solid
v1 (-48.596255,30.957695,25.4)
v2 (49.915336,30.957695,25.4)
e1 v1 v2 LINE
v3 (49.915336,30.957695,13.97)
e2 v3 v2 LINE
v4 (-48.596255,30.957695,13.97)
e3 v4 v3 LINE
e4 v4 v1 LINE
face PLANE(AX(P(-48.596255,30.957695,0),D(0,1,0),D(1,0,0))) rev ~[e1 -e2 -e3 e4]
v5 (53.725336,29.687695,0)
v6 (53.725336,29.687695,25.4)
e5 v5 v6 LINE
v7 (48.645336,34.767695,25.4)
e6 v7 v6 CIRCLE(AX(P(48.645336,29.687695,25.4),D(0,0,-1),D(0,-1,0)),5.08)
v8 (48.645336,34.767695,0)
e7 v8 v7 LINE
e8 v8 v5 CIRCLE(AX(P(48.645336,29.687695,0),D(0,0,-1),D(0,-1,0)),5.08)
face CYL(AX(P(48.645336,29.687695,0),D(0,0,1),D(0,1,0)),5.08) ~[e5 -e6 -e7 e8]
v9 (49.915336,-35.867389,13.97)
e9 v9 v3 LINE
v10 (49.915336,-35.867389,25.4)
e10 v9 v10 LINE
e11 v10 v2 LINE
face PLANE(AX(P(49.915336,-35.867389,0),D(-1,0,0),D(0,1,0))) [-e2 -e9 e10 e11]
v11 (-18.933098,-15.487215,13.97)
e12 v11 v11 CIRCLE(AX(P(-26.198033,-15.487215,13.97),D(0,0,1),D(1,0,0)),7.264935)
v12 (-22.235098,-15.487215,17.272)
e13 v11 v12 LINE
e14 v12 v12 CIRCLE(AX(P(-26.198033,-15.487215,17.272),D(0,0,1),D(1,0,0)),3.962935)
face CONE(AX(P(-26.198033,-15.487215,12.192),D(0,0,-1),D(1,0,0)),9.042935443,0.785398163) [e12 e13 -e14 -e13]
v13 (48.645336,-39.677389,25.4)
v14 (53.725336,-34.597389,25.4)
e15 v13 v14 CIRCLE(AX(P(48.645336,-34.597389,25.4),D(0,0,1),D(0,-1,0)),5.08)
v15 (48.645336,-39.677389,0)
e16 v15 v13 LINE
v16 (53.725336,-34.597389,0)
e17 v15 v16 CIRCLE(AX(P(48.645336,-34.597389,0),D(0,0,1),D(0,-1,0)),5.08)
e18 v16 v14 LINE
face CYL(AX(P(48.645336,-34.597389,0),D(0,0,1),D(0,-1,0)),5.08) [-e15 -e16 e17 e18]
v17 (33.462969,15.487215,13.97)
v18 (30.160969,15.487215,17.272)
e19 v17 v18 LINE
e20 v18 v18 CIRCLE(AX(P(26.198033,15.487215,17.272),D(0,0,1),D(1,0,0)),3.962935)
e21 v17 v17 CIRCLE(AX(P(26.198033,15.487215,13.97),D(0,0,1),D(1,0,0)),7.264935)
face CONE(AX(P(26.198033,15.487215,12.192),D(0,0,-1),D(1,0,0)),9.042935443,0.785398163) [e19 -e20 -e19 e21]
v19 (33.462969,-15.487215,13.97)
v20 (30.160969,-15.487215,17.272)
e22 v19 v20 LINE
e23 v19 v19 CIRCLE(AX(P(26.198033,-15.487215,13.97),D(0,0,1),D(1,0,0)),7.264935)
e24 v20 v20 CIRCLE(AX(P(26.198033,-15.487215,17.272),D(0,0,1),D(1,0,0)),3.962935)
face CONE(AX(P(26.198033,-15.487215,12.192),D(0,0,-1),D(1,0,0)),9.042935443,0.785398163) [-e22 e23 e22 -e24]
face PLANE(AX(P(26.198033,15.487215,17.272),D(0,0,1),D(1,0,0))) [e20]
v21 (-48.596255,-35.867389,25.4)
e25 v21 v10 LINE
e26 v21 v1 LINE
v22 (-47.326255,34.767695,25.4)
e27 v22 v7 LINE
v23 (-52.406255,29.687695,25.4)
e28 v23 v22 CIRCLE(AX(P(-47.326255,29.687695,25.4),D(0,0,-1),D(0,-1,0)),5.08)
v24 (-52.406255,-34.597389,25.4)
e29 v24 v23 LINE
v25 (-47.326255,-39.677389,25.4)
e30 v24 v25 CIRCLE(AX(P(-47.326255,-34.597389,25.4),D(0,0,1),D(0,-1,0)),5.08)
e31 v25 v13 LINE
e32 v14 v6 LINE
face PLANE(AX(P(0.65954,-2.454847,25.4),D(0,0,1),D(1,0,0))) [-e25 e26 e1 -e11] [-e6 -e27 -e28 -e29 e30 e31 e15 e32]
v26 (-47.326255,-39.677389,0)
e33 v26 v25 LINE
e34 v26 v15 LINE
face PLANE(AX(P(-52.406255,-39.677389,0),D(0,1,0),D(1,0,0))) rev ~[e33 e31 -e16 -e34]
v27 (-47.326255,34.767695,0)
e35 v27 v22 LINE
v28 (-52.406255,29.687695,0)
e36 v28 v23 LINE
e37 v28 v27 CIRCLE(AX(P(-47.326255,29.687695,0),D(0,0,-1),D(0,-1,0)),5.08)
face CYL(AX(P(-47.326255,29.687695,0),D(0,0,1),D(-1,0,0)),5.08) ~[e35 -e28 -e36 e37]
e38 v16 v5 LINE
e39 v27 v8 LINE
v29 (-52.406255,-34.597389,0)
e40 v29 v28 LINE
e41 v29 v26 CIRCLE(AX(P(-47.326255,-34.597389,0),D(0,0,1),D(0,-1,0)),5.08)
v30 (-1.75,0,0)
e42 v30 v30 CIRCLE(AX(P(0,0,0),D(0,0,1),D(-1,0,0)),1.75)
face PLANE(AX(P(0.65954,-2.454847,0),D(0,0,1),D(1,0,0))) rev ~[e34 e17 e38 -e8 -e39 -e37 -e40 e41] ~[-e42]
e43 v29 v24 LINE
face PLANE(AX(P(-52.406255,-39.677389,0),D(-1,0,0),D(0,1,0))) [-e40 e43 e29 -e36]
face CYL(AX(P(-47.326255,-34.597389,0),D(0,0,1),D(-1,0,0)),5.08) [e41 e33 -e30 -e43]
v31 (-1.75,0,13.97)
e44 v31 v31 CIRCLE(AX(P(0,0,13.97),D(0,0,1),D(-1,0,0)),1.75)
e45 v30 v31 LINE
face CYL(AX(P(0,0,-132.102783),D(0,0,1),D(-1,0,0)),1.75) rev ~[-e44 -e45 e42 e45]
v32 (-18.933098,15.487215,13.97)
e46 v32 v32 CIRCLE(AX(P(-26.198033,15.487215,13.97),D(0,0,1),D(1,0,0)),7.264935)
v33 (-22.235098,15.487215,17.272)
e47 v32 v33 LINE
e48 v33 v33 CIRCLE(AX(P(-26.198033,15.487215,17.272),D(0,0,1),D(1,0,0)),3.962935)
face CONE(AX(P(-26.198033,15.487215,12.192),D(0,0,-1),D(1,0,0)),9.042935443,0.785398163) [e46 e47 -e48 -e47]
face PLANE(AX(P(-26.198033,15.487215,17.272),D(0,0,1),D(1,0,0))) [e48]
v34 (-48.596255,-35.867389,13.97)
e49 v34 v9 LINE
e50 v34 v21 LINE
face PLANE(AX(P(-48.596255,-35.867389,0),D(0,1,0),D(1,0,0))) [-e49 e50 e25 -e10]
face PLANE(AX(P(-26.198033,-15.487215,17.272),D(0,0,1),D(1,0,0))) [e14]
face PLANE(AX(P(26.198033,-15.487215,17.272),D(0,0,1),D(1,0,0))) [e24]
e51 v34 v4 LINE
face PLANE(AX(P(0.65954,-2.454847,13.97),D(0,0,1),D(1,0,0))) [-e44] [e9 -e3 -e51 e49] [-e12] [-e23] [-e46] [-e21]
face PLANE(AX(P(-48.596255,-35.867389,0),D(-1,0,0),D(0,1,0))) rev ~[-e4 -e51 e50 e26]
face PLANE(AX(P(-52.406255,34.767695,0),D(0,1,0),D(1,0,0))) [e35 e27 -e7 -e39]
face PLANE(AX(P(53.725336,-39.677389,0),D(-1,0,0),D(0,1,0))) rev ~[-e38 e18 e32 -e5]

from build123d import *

# Parameters (mm, degrees)
F0_W     = 106.1315912282
F0_H     = 74.4450837374
F0_W_2   = 98.5115912282
F0_H_2   = 66.8250837374
F1_DEPTH = 25.4
F0_R     = 9.0429354427
F2_DEPTH = 13.97
F3_DEPTH = 17.272
F4_D     = 3.5
F6_R     = 5.08


# Not quite as in the source:
# - a fillet or chamfer that OpenCascade refuses, or shapes differently, is made with other operations: its cross-section is extruded or revolved along the edge and cut away or added


with BuildPart() as f1:
    # F0 (on Top) → F1 (new body)
    with BuildSketch(Plane.XY):
        with Locations((0.6595404583, -2.4548470974)):
            Rectangle(F0_W, F0_H)
        with Locations((0.6595404583, -2.4548470974)):
            Rectangle(F0_W_2, F0_H_2, mode=Mode.SUBTRACT)
    extrude(amount=F1_DEPTH)

    # F0 (on Top) → F2 (join)
    with BuildSketch(Plane.XY):
        with Locations((0.6595404583, -2.4548470974)):
            Rectangle(F0_W_2, F0_H_2)
        with Locations((-26.1980332434, -15.4872145504)):
            Circle(F0_R, mode=Mode.SUBTRACT)
        with Locations((26.1980332434, -15.4872145504)):
            Circle(F0_R, mode=Mode.SUBTRACT)
        with Locations((-26.1980332434, 15.4872145504)):
            Circle(F0_R, mode=Mode.SUBTRACT)
        with Locations((26.1980332434, 15.4872145504)):
            Circle(F0_R, mode=Mode.SUBTRACT)
    extrude(amount=F2_DEPTH)

    # F0 (on Top) → F3 (join)
    with BuildSketch(Plane.XY):
        with Locations((-26.1980332434, -15.4872145504)):
            Circle(F0_R)
        with Locations((-26.1980332434, 15.4872145504)):
            Circle(F0_R)
        with Locations((26.1980332434, 15.4872145504)):
            Circle(F0_R)
        with Locations((26.1980332434, -15.4872145504)):
            Circle(F0_R)
    extrude(amount=F3_DEPTH)

    # F4 (through all)
    with Locations(Plane(origin=(0, 0, 0), x_dir=(1, 0, 0), z_dir=(0, 0, -1))):
        with Locations((0, 0)):
            Hole(F4_D / 2)

    # F5: chamfer of 5.08 on 4 edges, made by hand


with BuildPart() as f5_tool2:
    # F5_s3 → F5_t4 (revolve)
    with BuildSketch(Plane.XZ.offset(-15.4872145504)):
        Polygon((-17.1550978007, 12.192), (-22.2350978007, 17.272), (-17.1550978007, 17.272), align=None)
    revolve(axis=Axis((-26.1980332434, 15.4872145504, 17.272), (0, 0, 1)))

    split(bisect_by=Plane.XY.offset(13.97), keep=Keep.TOP)


with BuildPart() as f1_1:
    add(f1.part)

    # F5_t1: cut F5_tool2
    add(f5_tool2.part, mode=Mode.SUBTRACT)


with BuildPart() as f5_tool7:
    # F5_s8 → F5_t9 (revolve)
    with BuildSketch(Plane.XZ.offset(-15.4872145504)):
        Polygon((35.2409686861, 12.192), (30.1609686861, 17.272), (35.2409686861, 17.272), align=None)
    revolve(axis=Axis((26.1980332434, 15.4872145504, 17.272), (0, 0, 1)))

    split(bisect_by=Plane.XY.offset(13.97), keep=Keep.TOP)


with BuildPart() as f1_2:
    add(f1_1.part)

    # F5_t6: cut F5_tool7
    add(f5_tool7.part, mode=Mode.SUBTRACT)


with BuildPart() as f5_tool12:
    # F5_s13 → F5_t14 (revolve)
    with BuildSketch(Plane.XZ.offset(15.4872145504)):
        Polygon((35.2409686861, 12.192), (30.1609686861, 17.272), (35.2409686861, 17.272), align=None)
    revolve(axis=Axis((26.1980332434, -15.4872145504, 17.272), (0, 0, 1)))

    split(bisect_by=Plane.XY.offset(13.97), keep=Keep.TOP)


with BuildPart() as f1_3:
    add(f1_2.part)

    # F5_t11: cut F5_tool12
    add(f5_tool12.part, mode=Mode.SUBTRACT)


with BuildPart() as f5_tool17:
    # F5_s18 → F5_t19 (revolve)
    with BuildSketch(Plane.XZ.offset(15.4872145504)):
        Polygon((-17.1550978007, 12.192), (-22.2350978007, 17.272), (-17.1550978007, 17.272), align=None)
    revolve(axis=Axis((-26.1980332434, -15.4872145504, 17.272), (0, 0, 1)))

    split(bisect_by=Plane.XY.offset(13.97), keep=Keep.TOP)


with BuildPart() as f1_4:
    add(f1_3.part)

    # F5_t16: cut F5_tool17
    add(f5_tool17.part, mode=Mode.SUBTRACT)

    # F6
    f6_edges = [f1_4.edges().sort_by_distance(p)[0] for p in [
        (-52.406255, -39.677389, 12.7),
        (-52.406255, 34.767695, 12.7),
        (53.725336, -39.677389, 12.7),
        (53.725336, 34.767695, 12.7),
    ]]
    fillet(f6_edges, radius=F6_R)


solid = f1_4.part
